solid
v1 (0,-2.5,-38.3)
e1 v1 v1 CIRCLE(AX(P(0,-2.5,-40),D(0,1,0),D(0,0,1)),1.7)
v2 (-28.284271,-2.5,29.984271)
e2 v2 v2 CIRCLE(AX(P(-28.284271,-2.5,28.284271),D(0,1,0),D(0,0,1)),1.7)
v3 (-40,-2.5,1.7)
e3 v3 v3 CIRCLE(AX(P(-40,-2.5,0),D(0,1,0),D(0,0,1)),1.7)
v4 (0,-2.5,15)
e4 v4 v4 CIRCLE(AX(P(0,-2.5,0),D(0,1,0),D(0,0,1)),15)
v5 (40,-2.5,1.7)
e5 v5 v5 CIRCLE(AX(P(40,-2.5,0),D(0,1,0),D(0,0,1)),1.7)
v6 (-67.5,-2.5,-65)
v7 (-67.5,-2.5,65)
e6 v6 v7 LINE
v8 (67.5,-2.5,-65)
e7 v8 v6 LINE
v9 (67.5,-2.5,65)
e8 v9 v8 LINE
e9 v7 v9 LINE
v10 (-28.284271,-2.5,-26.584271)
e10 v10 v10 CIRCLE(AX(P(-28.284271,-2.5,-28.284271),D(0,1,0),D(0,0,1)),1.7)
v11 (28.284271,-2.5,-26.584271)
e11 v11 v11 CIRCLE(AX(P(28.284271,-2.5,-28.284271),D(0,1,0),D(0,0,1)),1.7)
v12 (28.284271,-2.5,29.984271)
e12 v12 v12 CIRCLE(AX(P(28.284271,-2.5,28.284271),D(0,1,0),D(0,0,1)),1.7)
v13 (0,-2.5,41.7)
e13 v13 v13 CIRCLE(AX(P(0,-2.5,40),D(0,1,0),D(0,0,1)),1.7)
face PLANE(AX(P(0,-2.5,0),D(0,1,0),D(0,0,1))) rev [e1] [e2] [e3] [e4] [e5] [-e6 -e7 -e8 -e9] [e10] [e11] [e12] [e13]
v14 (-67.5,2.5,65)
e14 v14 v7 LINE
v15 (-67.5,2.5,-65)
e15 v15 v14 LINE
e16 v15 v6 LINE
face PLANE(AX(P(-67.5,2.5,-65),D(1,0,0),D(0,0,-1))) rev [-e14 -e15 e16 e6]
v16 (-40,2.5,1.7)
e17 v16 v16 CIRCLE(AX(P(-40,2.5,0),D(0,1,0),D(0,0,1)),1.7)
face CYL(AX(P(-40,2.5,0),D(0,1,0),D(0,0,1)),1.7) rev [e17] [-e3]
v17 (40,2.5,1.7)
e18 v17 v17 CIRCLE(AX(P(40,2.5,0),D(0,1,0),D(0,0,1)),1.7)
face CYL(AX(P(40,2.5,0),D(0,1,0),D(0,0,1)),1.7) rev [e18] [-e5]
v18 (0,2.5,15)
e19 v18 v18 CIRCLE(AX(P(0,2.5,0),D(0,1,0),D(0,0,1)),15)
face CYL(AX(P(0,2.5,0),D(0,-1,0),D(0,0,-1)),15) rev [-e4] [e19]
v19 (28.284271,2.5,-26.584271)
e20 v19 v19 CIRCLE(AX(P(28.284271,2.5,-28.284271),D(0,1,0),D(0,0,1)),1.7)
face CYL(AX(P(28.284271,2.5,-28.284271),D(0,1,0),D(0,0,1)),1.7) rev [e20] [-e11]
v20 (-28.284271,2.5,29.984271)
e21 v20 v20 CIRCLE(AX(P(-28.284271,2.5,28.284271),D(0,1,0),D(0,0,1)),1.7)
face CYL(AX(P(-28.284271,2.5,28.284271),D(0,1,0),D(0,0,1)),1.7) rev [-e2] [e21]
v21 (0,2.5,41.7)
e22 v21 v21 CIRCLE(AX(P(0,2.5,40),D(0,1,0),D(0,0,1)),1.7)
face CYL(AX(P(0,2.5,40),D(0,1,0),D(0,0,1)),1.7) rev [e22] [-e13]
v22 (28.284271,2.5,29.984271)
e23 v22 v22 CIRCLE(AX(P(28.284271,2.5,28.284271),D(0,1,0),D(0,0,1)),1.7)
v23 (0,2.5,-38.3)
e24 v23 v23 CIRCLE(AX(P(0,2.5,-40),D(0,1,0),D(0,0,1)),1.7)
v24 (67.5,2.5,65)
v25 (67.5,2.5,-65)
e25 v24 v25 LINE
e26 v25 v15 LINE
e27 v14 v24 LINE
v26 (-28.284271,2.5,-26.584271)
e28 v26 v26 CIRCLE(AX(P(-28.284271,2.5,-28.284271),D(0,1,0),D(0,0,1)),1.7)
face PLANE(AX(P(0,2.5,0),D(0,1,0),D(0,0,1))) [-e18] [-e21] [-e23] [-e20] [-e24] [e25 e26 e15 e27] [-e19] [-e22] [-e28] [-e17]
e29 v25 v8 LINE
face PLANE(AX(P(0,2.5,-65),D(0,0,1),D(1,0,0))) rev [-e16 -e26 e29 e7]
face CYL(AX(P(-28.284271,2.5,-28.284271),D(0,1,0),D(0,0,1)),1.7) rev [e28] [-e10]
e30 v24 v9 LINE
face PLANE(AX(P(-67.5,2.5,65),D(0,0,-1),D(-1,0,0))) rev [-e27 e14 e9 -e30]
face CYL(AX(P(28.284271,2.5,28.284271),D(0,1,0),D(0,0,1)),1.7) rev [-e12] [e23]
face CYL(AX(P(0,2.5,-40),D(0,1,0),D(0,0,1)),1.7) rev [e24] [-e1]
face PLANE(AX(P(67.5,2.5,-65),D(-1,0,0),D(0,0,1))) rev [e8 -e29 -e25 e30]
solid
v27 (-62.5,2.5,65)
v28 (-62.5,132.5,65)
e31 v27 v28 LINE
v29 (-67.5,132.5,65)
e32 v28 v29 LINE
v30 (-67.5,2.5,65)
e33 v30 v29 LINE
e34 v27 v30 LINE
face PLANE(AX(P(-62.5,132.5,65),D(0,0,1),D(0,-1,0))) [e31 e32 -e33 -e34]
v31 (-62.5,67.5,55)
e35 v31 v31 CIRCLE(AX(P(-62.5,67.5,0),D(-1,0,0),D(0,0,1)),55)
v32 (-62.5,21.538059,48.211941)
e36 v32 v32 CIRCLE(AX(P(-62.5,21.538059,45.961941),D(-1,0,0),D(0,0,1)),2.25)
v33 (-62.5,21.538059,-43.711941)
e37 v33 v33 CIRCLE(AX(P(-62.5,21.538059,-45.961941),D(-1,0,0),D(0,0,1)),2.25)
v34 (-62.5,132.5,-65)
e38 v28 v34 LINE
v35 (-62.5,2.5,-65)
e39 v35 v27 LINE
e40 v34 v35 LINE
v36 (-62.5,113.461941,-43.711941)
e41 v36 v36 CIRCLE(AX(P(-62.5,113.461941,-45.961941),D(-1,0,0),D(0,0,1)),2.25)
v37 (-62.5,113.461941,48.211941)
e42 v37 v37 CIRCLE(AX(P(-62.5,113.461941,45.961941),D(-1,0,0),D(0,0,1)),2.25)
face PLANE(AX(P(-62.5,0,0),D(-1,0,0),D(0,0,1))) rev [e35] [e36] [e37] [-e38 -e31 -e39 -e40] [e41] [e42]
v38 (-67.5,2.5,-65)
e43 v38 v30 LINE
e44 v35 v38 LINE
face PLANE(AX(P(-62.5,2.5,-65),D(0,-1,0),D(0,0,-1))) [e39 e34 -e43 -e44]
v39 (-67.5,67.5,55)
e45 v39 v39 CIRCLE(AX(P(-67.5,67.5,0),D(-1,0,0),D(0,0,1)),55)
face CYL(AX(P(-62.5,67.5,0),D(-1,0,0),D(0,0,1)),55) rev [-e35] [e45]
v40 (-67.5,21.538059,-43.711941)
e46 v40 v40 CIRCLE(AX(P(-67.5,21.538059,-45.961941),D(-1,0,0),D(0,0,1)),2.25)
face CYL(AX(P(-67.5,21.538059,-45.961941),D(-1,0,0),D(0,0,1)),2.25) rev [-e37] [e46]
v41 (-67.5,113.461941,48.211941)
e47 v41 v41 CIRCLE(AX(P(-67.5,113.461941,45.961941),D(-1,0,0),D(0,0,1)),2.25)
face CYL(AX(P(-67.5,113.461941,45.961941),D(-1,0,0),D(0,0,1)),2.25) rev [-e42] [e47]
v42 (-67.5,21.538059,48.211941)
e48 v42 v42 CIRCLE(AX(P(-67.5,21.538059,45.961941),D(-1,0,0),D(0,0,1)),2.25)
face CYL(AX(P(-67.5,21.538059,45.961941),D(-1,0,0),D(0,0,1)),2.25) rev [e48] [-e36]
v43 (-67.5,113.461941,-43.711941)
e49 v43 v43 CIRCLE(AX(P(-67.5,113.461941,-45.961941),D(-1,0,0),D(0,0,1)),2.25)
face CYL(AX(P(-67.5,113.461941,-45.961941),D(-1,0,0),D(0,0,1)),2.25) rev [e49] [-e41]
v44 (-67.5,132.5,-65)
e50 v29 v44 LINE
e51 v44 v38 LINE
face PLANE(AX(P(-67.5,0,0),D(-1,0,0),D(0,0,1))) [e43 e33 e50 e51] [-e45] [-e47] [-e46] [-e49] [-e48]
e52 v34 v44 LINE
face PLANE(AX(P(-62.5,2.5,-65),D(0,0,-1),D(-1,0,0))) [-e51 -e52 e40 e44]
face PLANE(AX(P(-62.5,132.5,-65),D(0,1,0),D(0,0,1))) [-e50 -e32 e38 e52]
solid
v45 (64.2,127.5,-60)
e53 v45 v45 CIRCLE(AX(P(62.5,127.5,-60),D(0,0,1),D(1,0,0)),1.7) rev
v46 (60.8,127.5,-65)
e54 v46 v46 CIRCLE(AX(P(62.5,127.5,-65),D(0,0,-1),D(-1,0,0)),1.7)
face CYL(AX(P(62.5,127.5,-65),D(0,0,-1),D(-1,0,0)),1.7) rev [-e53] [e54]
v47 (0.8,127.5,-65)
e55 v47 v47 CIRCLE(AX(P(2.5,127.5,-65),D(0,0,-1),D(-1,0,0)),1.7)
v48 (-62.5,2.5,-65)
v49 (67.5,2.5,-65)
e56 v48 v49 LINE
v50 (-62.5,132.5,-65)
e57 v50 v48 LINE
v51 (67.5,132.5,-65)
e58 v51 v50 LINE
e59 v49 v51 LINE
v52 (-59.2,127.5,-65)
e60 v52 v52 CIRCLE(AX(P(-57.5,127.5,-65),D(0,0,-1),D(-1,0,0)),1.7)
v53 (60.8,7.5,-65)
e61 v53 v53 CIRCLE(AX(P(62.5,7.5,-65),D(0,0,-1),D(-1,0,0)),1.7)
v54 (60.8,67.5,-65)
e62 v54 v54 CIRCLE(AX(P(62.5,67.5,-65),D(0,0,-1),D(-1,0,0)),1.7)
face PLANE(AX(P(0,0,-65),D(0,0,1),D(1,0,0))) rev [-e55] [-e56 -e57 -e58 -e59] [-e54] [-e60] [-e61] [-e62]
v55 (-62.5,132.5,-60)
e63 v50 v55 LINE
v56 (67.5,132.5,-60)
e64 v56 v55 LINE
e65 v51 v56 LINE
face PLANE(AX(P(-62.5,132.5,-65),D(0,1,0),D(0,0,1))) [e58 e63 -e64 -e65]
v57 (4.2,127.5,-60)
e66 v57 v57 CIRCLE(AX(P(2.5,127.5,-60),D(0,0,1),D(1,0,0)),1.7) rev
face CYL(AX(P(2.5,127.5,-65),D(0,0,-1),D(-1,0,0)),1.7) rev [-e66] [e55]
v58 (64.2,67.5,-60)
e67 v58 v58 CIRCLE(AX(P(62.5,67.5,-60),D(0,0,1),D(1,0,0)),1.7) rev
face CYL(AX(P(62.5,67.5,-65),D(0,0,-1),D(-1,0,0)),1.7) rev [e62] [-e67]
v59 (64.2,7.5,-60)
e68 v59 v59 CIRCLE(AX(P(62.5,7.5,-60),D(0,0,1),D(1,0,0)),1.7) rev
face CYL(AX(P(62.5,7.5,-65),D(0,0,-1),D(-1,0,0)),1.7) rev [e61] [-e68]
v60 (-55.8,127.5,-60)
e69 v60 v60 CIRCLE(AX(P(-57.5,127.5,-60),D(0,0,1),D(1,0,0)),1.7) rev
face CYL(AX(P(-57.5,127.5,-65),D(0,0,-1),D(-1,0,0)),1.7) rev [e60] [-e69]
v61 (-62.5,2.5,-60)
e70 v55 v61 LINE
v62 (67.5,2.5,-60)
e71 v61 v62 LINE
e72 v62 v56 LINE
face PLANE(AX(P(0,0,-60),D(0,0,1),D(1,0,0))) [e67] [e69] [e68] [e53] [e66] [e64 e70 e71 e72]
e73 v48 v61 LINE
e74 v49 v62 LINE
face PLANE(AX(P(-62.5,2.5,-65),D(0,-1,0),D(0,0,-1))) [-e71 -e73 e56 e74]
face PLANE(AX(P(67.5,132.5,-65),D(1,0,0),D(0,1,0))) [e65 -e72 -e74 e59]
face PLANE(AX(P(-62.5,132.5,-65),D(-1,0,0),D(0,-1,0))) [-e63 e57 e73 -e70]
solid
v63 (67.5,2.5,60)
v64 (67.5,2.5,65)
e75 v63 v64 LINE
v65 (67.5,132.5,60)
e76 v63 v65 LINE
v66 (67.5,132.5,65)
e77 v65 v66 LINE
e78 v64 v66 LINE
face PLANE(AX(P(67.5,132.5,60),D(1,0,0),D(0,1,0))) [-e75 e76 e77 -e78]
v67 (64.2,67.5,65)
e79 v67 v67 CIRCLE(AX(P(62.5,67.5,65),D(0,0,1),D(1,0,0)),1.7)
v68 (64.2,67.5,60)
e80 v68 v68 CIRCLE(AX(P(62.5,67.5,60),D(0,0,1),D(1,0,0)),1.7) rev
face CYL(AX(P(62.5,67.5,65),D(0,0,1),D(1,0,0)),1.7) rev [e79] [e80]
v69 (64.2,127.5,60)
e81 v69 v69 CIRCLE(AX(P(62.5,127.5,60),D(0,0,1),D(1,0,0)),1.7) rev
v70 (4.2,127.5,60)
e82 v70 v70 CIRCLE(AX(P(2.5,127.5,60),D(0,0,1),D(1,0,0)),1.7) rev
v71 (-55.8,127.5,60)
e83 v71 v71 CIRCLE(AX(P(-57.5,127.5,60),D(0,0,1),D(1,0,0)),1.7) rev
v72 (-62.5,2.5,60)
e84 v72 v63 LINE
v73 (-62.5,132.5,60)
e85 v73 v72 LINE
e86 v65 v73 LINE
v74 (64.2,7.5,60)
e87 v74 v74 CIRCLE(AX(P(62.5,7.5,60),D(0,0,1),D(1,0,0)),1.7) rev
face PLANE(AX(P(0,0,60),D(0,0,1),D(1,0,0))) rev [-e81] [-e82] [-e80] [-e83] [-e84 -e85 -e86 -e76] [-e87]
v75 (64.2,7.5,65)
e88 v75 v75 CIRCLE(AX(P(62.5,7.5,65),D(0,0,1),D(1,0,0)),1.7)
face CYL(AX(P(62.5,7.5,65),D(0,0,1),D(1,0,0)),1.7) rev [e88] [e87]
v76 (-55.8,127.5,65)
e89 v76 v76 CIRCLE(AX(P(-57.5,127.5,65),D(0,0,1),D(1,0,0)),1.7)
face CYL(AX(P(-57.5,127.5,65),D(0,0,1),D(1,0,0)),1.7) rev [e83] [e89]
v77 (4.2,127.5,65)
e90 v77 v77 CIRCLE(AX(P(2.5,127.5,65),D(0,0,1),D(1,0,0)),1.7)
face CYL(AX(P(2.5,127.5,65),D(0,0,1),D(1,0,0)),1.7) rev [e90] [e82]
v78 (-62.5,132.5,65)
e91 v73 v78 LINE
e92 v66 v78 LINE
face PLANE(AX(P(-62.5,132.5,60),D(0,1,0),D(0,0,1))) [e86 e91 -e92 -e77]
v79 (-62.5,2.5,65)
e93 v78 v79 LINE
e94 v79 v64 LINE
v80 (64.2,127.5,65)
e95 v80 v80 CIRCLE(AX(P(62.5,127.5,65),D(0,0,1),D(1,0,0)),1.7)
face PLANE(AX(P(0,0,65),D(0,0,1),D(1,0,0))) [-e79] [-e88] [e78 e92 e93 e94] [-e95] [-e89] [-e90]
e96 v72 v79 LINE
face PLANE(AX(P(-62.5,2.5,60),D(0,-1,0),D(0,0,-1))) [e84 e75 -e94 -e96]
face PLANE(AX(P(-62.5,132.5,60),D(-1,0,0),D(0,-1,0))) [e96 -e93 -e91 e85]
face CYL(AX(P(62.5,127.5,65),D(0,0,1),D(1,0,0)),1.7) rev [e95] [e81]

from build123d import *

# Parameters (mm, degrees)
CROQUIS1_R                            = 15
SALIENTE_EXTRUIR1_DEPTH               = 2.5
TALADRO_DE_MARGEN_PARA_M31_D          = 3.4
TALADRO_DE_MARGEN_PARA_M31_DEPTH      = 20
TALADRO_DE_MARGEN_PARA_M31_TIP        = 1.021463052
CROQUIS5_W                            = 130
CROQUIS5_H                            = 130
CROQUIS5_R                            = 55
SALIENTE_EXTRUIR2_DEPTH               = 5
TALADRO_DE_MARGEN_PARA_M41_AT_2_COUNT = 2
TALADRO_DE_MARGEN_PARA_M41_AT_2_PITCH = 130
TALADRO_DE_MARGEN_PARA_M41_AT_3_COUNT = 2
TALADRO_DE_MARGEN_PARA_M41_AT_3_PITCH = 91.923881554
TALADRO_DE_MARGEN_PARA_M41_AT_4_COUNT = 2
TALADRO_DE_MARGEN_PARA_M41_AT_4_PITCH = 91.923881554
CROQUIS9_W                            = 130
CROQUIS9_H                            = 130
SALIENTE_EXTRUIR4_DEPTH               = 5
TALADRO_START                         = 60
TALADRO_DE_MARGEN_PARA_M32_OUTLINE_R  = 1.7
TALADRO_DE_MARGEN_PARA_M32_DEPTH      = 5
MATRIZL2_COUNT                        = 2
MATRIZL2_PITCH                        = 125
TALADRO_START_2                       = -65
TALADRO_DE_MARGEN_PARA_M33_OUTLINE_R  = 1.7
TALADRO_DE_MARGEN_PARA_M33_DEPTH      = 5


# Read off the part's stored shape, not the designer's step: Taladro de margen para M32, Taladro de margen para M33
with BuildPart() as part:
    # Croquis1 → Saliente-Extruir1 (new, symmetric)
    with BuildSketch(Plane(origin=(0, 0, 0), x_dir=(1, 0, 0), z_dir=(0, 1, 0))):
        Polygon((0, 65), (-67.5, 65), (-67.5, -65), (0, -65), (67.5, -65), (67.5, 65), align=None)
        with Locations(Location((0, 0, 0), (0, 0, 270))):
            Circle(CROQUIS1_R, mode=Mode.SUBTRACT)
    extrude(amount=SALIENTE_EXTRUIR1_DEPTH, both=True)

    # Taladro de margen para M31
    with Locations(Plane(origin=(0, 2.5, 0), x_dir=(1, 0, 0), z_dir=(0, 1, 0))):
        with Locations((0, 40), (28.284271247, 28.284271247), (40, 0), (28.284271247, -28.284271247), (0, -40), (-28.284271247, -28.284271247), (-40, 0), (-28.284271247, 28.284271247)):
            Hole(TALADRO_DE_MARGEN_PARA_M31_D / 2, depth=TALADRO_DE_MARGEN_PARA_M31_DEPTH)
            with Locations((0, 0, -(TALADRO_DE_MARGEN_PARA_M31_DEPTH + TALADRO_DE_MARGEN_PARA_M31_TIP / 2))):  # 118° drill point
                Cone(0, TALADRO_DE_MARGEN_PARA_M31_D / 2, TALADRO_DE_MARGEN_PARA_M31_TIP, mode=Mode.SUBTRACT)


with BuildPart() as body_2:
    # Croquis5 → Saliente-Extruir2 (new body)
    with BuildSketch(Plane.ZY.offset(67.5)):
        with Locations((0, 67.5)):
            Rectangle(CROQUIS5_W, CROQUIS5_H)
        with Locations((0, 67.5)):
            Circle(CROQUIS5_R, mode=Mode.SUBTRACT)
    extrude(amount=-SALIENTE_EXTRUIR2_DEPTH)

    # Croquis7 → Taladro de margen para M41 (revolve, cut)
    with BuildSketch(Plane(origin=(-67.5, 113.461940777, 45.961940777), x_dir=(0, 0, 1), z_dir=(0, 1, 0))):
        Polygon((0, 0), (0, 21.351936393), (2.25, 20), (2.25, 0), align=None)
    taladro_de_margen_para_m41 = revolve(axis=Axis((-73.85, 113.461940777, 45.961940777), (1, 0, 0)), mode=Mode.SUBTRACT)

    # Taladro de margen para M41 at 2: Taladro de margen para M41 ×2
    with Locations(*[Vector(0, -0.7071067811865476, -0.7071067811865476) * (i * TALADRO_DE_MARGEN_PARA_M41_AT_2_PITCH) for i in range(1, TALADRO_DE_MARGEN_PARA_M41_AT_2_COUNT)]):
        add(taladro_de_margen_para_m41, mode=Mode.SUBTRACT)

    # Taladro de margen para M41 at 3: Taladro de margen para M41 ×2
    with Locations(*[(0, 0, -i * TALADRO_DE_MARGEN_PARA_M41_AT_3_PITCH) for i in range(1, TALADRO_DE_MARGEN_PARA_M41_AT_3_COUNT)]):
        add(taladro_de_margen_para_m41, mode=Mode.SUBTRACT)

    # Taladro de margen para M41 at 4: Taladro de margen para M41 ×2
    with Locations(*[(0, -i * TALADRO_DE_MARGEN_PARA_M41_AT_4_PITCH, 0) for i in range(1, TALADRO_DE_MARGEN_PARA_M41_AT_4_COUNT)]):
        add(taladro_de_margen_para_m41, mode=Mode.SUBTRACT)


with BuildPart() as body_3:
    # Croquis9 → Saliente-Extruir4 (new body)
    with BuildSketch(Plane.XY.offset(65)):
        with Locations((2.5, 67.5)):
            Rectangle(CROQUIS9_W, CROQUIS9_H)
    saliente_extruir4 = extrude(amount=-SALIENTE_EXTRUIR4_DEPTH)

    # Taladro de margen para M32 outline → Taladro de margen para M32 (cut)
    with BuildSketch(Plane.XY.offset(TALADRO_START)):
        with Locations((62.5, 7.5)):
            Circle(TALADRO_DE_MARGEN_PARA_M32_OUTLINE_R)
        with Locations((62.5, 67.5)):
            Circle(TALADRO_DE_MARGEN_PARA_M32_OUTLINE_R)
        with Locations((62.5, 127.5)):
            Circle(TALADRO_DE_MARGEN_PARA_M32_OUTLINE_R)
        with Locations((2.5, 127.5)):
            Circle(TALADRO_DE_MARGEN_PARA_M32_OUTLINE_R)
        with Locations((-57.5, 127.5)):
            Circle(TALADRO_DE_MARGEN_PARA_M32_OUTLINE_R)
    extrude(amount=TALADRO_DE_MARGEN_PARA_M32_DEPTH, mode=Mode.SUBTRACT)


with BuildPart() as matrizl2_1:
    # MatrizL2: Saliente-Extruir4 ×2
    with Locations(*[(0, 0, -i * MATRIZL2_PITCH) for i in range(1, MATRIZL2_COUNT)]):
        add(saliente_extruir4)

    # Taladro de margen para M33 outline → Taladro de margen para M33 (cut)
    with BuildSketch(Plane.XY.offset(TALADRO_START_2)):
        with Locations((62.5, 67.5)):
            Circle(TALADRO_DE_MARGEN_PARA_M33_OUTLINE_R)
        with Locations((62.5, 7.5)):
            Circle(TALADRO_DE_MARGEN_PARA_M33_OUTLINE_R)
        with Locations((2.5, 127.5)):
            Circle(TALADRO_DE_MARGEN_PARA_M33_OUTLINE_R)
        with Locations((-57.5, 127.5)):
            Circle(TALADRO_DE_MARGEN_PARA_M33_OUTLINE_R)
        with Locations((62.5, 127.5)):
            Circle(TALADRO_DE_MARGEN_PARA_M33_OUTLINE_R)
    extrude(amount=TALADRO_DE_MARGEN_PARA_M33_DEPTH, mode=Mode.SUBTRACT)


solid = Compound([part.part, body_2.part, body_3.part, matrizl2_1.part])
